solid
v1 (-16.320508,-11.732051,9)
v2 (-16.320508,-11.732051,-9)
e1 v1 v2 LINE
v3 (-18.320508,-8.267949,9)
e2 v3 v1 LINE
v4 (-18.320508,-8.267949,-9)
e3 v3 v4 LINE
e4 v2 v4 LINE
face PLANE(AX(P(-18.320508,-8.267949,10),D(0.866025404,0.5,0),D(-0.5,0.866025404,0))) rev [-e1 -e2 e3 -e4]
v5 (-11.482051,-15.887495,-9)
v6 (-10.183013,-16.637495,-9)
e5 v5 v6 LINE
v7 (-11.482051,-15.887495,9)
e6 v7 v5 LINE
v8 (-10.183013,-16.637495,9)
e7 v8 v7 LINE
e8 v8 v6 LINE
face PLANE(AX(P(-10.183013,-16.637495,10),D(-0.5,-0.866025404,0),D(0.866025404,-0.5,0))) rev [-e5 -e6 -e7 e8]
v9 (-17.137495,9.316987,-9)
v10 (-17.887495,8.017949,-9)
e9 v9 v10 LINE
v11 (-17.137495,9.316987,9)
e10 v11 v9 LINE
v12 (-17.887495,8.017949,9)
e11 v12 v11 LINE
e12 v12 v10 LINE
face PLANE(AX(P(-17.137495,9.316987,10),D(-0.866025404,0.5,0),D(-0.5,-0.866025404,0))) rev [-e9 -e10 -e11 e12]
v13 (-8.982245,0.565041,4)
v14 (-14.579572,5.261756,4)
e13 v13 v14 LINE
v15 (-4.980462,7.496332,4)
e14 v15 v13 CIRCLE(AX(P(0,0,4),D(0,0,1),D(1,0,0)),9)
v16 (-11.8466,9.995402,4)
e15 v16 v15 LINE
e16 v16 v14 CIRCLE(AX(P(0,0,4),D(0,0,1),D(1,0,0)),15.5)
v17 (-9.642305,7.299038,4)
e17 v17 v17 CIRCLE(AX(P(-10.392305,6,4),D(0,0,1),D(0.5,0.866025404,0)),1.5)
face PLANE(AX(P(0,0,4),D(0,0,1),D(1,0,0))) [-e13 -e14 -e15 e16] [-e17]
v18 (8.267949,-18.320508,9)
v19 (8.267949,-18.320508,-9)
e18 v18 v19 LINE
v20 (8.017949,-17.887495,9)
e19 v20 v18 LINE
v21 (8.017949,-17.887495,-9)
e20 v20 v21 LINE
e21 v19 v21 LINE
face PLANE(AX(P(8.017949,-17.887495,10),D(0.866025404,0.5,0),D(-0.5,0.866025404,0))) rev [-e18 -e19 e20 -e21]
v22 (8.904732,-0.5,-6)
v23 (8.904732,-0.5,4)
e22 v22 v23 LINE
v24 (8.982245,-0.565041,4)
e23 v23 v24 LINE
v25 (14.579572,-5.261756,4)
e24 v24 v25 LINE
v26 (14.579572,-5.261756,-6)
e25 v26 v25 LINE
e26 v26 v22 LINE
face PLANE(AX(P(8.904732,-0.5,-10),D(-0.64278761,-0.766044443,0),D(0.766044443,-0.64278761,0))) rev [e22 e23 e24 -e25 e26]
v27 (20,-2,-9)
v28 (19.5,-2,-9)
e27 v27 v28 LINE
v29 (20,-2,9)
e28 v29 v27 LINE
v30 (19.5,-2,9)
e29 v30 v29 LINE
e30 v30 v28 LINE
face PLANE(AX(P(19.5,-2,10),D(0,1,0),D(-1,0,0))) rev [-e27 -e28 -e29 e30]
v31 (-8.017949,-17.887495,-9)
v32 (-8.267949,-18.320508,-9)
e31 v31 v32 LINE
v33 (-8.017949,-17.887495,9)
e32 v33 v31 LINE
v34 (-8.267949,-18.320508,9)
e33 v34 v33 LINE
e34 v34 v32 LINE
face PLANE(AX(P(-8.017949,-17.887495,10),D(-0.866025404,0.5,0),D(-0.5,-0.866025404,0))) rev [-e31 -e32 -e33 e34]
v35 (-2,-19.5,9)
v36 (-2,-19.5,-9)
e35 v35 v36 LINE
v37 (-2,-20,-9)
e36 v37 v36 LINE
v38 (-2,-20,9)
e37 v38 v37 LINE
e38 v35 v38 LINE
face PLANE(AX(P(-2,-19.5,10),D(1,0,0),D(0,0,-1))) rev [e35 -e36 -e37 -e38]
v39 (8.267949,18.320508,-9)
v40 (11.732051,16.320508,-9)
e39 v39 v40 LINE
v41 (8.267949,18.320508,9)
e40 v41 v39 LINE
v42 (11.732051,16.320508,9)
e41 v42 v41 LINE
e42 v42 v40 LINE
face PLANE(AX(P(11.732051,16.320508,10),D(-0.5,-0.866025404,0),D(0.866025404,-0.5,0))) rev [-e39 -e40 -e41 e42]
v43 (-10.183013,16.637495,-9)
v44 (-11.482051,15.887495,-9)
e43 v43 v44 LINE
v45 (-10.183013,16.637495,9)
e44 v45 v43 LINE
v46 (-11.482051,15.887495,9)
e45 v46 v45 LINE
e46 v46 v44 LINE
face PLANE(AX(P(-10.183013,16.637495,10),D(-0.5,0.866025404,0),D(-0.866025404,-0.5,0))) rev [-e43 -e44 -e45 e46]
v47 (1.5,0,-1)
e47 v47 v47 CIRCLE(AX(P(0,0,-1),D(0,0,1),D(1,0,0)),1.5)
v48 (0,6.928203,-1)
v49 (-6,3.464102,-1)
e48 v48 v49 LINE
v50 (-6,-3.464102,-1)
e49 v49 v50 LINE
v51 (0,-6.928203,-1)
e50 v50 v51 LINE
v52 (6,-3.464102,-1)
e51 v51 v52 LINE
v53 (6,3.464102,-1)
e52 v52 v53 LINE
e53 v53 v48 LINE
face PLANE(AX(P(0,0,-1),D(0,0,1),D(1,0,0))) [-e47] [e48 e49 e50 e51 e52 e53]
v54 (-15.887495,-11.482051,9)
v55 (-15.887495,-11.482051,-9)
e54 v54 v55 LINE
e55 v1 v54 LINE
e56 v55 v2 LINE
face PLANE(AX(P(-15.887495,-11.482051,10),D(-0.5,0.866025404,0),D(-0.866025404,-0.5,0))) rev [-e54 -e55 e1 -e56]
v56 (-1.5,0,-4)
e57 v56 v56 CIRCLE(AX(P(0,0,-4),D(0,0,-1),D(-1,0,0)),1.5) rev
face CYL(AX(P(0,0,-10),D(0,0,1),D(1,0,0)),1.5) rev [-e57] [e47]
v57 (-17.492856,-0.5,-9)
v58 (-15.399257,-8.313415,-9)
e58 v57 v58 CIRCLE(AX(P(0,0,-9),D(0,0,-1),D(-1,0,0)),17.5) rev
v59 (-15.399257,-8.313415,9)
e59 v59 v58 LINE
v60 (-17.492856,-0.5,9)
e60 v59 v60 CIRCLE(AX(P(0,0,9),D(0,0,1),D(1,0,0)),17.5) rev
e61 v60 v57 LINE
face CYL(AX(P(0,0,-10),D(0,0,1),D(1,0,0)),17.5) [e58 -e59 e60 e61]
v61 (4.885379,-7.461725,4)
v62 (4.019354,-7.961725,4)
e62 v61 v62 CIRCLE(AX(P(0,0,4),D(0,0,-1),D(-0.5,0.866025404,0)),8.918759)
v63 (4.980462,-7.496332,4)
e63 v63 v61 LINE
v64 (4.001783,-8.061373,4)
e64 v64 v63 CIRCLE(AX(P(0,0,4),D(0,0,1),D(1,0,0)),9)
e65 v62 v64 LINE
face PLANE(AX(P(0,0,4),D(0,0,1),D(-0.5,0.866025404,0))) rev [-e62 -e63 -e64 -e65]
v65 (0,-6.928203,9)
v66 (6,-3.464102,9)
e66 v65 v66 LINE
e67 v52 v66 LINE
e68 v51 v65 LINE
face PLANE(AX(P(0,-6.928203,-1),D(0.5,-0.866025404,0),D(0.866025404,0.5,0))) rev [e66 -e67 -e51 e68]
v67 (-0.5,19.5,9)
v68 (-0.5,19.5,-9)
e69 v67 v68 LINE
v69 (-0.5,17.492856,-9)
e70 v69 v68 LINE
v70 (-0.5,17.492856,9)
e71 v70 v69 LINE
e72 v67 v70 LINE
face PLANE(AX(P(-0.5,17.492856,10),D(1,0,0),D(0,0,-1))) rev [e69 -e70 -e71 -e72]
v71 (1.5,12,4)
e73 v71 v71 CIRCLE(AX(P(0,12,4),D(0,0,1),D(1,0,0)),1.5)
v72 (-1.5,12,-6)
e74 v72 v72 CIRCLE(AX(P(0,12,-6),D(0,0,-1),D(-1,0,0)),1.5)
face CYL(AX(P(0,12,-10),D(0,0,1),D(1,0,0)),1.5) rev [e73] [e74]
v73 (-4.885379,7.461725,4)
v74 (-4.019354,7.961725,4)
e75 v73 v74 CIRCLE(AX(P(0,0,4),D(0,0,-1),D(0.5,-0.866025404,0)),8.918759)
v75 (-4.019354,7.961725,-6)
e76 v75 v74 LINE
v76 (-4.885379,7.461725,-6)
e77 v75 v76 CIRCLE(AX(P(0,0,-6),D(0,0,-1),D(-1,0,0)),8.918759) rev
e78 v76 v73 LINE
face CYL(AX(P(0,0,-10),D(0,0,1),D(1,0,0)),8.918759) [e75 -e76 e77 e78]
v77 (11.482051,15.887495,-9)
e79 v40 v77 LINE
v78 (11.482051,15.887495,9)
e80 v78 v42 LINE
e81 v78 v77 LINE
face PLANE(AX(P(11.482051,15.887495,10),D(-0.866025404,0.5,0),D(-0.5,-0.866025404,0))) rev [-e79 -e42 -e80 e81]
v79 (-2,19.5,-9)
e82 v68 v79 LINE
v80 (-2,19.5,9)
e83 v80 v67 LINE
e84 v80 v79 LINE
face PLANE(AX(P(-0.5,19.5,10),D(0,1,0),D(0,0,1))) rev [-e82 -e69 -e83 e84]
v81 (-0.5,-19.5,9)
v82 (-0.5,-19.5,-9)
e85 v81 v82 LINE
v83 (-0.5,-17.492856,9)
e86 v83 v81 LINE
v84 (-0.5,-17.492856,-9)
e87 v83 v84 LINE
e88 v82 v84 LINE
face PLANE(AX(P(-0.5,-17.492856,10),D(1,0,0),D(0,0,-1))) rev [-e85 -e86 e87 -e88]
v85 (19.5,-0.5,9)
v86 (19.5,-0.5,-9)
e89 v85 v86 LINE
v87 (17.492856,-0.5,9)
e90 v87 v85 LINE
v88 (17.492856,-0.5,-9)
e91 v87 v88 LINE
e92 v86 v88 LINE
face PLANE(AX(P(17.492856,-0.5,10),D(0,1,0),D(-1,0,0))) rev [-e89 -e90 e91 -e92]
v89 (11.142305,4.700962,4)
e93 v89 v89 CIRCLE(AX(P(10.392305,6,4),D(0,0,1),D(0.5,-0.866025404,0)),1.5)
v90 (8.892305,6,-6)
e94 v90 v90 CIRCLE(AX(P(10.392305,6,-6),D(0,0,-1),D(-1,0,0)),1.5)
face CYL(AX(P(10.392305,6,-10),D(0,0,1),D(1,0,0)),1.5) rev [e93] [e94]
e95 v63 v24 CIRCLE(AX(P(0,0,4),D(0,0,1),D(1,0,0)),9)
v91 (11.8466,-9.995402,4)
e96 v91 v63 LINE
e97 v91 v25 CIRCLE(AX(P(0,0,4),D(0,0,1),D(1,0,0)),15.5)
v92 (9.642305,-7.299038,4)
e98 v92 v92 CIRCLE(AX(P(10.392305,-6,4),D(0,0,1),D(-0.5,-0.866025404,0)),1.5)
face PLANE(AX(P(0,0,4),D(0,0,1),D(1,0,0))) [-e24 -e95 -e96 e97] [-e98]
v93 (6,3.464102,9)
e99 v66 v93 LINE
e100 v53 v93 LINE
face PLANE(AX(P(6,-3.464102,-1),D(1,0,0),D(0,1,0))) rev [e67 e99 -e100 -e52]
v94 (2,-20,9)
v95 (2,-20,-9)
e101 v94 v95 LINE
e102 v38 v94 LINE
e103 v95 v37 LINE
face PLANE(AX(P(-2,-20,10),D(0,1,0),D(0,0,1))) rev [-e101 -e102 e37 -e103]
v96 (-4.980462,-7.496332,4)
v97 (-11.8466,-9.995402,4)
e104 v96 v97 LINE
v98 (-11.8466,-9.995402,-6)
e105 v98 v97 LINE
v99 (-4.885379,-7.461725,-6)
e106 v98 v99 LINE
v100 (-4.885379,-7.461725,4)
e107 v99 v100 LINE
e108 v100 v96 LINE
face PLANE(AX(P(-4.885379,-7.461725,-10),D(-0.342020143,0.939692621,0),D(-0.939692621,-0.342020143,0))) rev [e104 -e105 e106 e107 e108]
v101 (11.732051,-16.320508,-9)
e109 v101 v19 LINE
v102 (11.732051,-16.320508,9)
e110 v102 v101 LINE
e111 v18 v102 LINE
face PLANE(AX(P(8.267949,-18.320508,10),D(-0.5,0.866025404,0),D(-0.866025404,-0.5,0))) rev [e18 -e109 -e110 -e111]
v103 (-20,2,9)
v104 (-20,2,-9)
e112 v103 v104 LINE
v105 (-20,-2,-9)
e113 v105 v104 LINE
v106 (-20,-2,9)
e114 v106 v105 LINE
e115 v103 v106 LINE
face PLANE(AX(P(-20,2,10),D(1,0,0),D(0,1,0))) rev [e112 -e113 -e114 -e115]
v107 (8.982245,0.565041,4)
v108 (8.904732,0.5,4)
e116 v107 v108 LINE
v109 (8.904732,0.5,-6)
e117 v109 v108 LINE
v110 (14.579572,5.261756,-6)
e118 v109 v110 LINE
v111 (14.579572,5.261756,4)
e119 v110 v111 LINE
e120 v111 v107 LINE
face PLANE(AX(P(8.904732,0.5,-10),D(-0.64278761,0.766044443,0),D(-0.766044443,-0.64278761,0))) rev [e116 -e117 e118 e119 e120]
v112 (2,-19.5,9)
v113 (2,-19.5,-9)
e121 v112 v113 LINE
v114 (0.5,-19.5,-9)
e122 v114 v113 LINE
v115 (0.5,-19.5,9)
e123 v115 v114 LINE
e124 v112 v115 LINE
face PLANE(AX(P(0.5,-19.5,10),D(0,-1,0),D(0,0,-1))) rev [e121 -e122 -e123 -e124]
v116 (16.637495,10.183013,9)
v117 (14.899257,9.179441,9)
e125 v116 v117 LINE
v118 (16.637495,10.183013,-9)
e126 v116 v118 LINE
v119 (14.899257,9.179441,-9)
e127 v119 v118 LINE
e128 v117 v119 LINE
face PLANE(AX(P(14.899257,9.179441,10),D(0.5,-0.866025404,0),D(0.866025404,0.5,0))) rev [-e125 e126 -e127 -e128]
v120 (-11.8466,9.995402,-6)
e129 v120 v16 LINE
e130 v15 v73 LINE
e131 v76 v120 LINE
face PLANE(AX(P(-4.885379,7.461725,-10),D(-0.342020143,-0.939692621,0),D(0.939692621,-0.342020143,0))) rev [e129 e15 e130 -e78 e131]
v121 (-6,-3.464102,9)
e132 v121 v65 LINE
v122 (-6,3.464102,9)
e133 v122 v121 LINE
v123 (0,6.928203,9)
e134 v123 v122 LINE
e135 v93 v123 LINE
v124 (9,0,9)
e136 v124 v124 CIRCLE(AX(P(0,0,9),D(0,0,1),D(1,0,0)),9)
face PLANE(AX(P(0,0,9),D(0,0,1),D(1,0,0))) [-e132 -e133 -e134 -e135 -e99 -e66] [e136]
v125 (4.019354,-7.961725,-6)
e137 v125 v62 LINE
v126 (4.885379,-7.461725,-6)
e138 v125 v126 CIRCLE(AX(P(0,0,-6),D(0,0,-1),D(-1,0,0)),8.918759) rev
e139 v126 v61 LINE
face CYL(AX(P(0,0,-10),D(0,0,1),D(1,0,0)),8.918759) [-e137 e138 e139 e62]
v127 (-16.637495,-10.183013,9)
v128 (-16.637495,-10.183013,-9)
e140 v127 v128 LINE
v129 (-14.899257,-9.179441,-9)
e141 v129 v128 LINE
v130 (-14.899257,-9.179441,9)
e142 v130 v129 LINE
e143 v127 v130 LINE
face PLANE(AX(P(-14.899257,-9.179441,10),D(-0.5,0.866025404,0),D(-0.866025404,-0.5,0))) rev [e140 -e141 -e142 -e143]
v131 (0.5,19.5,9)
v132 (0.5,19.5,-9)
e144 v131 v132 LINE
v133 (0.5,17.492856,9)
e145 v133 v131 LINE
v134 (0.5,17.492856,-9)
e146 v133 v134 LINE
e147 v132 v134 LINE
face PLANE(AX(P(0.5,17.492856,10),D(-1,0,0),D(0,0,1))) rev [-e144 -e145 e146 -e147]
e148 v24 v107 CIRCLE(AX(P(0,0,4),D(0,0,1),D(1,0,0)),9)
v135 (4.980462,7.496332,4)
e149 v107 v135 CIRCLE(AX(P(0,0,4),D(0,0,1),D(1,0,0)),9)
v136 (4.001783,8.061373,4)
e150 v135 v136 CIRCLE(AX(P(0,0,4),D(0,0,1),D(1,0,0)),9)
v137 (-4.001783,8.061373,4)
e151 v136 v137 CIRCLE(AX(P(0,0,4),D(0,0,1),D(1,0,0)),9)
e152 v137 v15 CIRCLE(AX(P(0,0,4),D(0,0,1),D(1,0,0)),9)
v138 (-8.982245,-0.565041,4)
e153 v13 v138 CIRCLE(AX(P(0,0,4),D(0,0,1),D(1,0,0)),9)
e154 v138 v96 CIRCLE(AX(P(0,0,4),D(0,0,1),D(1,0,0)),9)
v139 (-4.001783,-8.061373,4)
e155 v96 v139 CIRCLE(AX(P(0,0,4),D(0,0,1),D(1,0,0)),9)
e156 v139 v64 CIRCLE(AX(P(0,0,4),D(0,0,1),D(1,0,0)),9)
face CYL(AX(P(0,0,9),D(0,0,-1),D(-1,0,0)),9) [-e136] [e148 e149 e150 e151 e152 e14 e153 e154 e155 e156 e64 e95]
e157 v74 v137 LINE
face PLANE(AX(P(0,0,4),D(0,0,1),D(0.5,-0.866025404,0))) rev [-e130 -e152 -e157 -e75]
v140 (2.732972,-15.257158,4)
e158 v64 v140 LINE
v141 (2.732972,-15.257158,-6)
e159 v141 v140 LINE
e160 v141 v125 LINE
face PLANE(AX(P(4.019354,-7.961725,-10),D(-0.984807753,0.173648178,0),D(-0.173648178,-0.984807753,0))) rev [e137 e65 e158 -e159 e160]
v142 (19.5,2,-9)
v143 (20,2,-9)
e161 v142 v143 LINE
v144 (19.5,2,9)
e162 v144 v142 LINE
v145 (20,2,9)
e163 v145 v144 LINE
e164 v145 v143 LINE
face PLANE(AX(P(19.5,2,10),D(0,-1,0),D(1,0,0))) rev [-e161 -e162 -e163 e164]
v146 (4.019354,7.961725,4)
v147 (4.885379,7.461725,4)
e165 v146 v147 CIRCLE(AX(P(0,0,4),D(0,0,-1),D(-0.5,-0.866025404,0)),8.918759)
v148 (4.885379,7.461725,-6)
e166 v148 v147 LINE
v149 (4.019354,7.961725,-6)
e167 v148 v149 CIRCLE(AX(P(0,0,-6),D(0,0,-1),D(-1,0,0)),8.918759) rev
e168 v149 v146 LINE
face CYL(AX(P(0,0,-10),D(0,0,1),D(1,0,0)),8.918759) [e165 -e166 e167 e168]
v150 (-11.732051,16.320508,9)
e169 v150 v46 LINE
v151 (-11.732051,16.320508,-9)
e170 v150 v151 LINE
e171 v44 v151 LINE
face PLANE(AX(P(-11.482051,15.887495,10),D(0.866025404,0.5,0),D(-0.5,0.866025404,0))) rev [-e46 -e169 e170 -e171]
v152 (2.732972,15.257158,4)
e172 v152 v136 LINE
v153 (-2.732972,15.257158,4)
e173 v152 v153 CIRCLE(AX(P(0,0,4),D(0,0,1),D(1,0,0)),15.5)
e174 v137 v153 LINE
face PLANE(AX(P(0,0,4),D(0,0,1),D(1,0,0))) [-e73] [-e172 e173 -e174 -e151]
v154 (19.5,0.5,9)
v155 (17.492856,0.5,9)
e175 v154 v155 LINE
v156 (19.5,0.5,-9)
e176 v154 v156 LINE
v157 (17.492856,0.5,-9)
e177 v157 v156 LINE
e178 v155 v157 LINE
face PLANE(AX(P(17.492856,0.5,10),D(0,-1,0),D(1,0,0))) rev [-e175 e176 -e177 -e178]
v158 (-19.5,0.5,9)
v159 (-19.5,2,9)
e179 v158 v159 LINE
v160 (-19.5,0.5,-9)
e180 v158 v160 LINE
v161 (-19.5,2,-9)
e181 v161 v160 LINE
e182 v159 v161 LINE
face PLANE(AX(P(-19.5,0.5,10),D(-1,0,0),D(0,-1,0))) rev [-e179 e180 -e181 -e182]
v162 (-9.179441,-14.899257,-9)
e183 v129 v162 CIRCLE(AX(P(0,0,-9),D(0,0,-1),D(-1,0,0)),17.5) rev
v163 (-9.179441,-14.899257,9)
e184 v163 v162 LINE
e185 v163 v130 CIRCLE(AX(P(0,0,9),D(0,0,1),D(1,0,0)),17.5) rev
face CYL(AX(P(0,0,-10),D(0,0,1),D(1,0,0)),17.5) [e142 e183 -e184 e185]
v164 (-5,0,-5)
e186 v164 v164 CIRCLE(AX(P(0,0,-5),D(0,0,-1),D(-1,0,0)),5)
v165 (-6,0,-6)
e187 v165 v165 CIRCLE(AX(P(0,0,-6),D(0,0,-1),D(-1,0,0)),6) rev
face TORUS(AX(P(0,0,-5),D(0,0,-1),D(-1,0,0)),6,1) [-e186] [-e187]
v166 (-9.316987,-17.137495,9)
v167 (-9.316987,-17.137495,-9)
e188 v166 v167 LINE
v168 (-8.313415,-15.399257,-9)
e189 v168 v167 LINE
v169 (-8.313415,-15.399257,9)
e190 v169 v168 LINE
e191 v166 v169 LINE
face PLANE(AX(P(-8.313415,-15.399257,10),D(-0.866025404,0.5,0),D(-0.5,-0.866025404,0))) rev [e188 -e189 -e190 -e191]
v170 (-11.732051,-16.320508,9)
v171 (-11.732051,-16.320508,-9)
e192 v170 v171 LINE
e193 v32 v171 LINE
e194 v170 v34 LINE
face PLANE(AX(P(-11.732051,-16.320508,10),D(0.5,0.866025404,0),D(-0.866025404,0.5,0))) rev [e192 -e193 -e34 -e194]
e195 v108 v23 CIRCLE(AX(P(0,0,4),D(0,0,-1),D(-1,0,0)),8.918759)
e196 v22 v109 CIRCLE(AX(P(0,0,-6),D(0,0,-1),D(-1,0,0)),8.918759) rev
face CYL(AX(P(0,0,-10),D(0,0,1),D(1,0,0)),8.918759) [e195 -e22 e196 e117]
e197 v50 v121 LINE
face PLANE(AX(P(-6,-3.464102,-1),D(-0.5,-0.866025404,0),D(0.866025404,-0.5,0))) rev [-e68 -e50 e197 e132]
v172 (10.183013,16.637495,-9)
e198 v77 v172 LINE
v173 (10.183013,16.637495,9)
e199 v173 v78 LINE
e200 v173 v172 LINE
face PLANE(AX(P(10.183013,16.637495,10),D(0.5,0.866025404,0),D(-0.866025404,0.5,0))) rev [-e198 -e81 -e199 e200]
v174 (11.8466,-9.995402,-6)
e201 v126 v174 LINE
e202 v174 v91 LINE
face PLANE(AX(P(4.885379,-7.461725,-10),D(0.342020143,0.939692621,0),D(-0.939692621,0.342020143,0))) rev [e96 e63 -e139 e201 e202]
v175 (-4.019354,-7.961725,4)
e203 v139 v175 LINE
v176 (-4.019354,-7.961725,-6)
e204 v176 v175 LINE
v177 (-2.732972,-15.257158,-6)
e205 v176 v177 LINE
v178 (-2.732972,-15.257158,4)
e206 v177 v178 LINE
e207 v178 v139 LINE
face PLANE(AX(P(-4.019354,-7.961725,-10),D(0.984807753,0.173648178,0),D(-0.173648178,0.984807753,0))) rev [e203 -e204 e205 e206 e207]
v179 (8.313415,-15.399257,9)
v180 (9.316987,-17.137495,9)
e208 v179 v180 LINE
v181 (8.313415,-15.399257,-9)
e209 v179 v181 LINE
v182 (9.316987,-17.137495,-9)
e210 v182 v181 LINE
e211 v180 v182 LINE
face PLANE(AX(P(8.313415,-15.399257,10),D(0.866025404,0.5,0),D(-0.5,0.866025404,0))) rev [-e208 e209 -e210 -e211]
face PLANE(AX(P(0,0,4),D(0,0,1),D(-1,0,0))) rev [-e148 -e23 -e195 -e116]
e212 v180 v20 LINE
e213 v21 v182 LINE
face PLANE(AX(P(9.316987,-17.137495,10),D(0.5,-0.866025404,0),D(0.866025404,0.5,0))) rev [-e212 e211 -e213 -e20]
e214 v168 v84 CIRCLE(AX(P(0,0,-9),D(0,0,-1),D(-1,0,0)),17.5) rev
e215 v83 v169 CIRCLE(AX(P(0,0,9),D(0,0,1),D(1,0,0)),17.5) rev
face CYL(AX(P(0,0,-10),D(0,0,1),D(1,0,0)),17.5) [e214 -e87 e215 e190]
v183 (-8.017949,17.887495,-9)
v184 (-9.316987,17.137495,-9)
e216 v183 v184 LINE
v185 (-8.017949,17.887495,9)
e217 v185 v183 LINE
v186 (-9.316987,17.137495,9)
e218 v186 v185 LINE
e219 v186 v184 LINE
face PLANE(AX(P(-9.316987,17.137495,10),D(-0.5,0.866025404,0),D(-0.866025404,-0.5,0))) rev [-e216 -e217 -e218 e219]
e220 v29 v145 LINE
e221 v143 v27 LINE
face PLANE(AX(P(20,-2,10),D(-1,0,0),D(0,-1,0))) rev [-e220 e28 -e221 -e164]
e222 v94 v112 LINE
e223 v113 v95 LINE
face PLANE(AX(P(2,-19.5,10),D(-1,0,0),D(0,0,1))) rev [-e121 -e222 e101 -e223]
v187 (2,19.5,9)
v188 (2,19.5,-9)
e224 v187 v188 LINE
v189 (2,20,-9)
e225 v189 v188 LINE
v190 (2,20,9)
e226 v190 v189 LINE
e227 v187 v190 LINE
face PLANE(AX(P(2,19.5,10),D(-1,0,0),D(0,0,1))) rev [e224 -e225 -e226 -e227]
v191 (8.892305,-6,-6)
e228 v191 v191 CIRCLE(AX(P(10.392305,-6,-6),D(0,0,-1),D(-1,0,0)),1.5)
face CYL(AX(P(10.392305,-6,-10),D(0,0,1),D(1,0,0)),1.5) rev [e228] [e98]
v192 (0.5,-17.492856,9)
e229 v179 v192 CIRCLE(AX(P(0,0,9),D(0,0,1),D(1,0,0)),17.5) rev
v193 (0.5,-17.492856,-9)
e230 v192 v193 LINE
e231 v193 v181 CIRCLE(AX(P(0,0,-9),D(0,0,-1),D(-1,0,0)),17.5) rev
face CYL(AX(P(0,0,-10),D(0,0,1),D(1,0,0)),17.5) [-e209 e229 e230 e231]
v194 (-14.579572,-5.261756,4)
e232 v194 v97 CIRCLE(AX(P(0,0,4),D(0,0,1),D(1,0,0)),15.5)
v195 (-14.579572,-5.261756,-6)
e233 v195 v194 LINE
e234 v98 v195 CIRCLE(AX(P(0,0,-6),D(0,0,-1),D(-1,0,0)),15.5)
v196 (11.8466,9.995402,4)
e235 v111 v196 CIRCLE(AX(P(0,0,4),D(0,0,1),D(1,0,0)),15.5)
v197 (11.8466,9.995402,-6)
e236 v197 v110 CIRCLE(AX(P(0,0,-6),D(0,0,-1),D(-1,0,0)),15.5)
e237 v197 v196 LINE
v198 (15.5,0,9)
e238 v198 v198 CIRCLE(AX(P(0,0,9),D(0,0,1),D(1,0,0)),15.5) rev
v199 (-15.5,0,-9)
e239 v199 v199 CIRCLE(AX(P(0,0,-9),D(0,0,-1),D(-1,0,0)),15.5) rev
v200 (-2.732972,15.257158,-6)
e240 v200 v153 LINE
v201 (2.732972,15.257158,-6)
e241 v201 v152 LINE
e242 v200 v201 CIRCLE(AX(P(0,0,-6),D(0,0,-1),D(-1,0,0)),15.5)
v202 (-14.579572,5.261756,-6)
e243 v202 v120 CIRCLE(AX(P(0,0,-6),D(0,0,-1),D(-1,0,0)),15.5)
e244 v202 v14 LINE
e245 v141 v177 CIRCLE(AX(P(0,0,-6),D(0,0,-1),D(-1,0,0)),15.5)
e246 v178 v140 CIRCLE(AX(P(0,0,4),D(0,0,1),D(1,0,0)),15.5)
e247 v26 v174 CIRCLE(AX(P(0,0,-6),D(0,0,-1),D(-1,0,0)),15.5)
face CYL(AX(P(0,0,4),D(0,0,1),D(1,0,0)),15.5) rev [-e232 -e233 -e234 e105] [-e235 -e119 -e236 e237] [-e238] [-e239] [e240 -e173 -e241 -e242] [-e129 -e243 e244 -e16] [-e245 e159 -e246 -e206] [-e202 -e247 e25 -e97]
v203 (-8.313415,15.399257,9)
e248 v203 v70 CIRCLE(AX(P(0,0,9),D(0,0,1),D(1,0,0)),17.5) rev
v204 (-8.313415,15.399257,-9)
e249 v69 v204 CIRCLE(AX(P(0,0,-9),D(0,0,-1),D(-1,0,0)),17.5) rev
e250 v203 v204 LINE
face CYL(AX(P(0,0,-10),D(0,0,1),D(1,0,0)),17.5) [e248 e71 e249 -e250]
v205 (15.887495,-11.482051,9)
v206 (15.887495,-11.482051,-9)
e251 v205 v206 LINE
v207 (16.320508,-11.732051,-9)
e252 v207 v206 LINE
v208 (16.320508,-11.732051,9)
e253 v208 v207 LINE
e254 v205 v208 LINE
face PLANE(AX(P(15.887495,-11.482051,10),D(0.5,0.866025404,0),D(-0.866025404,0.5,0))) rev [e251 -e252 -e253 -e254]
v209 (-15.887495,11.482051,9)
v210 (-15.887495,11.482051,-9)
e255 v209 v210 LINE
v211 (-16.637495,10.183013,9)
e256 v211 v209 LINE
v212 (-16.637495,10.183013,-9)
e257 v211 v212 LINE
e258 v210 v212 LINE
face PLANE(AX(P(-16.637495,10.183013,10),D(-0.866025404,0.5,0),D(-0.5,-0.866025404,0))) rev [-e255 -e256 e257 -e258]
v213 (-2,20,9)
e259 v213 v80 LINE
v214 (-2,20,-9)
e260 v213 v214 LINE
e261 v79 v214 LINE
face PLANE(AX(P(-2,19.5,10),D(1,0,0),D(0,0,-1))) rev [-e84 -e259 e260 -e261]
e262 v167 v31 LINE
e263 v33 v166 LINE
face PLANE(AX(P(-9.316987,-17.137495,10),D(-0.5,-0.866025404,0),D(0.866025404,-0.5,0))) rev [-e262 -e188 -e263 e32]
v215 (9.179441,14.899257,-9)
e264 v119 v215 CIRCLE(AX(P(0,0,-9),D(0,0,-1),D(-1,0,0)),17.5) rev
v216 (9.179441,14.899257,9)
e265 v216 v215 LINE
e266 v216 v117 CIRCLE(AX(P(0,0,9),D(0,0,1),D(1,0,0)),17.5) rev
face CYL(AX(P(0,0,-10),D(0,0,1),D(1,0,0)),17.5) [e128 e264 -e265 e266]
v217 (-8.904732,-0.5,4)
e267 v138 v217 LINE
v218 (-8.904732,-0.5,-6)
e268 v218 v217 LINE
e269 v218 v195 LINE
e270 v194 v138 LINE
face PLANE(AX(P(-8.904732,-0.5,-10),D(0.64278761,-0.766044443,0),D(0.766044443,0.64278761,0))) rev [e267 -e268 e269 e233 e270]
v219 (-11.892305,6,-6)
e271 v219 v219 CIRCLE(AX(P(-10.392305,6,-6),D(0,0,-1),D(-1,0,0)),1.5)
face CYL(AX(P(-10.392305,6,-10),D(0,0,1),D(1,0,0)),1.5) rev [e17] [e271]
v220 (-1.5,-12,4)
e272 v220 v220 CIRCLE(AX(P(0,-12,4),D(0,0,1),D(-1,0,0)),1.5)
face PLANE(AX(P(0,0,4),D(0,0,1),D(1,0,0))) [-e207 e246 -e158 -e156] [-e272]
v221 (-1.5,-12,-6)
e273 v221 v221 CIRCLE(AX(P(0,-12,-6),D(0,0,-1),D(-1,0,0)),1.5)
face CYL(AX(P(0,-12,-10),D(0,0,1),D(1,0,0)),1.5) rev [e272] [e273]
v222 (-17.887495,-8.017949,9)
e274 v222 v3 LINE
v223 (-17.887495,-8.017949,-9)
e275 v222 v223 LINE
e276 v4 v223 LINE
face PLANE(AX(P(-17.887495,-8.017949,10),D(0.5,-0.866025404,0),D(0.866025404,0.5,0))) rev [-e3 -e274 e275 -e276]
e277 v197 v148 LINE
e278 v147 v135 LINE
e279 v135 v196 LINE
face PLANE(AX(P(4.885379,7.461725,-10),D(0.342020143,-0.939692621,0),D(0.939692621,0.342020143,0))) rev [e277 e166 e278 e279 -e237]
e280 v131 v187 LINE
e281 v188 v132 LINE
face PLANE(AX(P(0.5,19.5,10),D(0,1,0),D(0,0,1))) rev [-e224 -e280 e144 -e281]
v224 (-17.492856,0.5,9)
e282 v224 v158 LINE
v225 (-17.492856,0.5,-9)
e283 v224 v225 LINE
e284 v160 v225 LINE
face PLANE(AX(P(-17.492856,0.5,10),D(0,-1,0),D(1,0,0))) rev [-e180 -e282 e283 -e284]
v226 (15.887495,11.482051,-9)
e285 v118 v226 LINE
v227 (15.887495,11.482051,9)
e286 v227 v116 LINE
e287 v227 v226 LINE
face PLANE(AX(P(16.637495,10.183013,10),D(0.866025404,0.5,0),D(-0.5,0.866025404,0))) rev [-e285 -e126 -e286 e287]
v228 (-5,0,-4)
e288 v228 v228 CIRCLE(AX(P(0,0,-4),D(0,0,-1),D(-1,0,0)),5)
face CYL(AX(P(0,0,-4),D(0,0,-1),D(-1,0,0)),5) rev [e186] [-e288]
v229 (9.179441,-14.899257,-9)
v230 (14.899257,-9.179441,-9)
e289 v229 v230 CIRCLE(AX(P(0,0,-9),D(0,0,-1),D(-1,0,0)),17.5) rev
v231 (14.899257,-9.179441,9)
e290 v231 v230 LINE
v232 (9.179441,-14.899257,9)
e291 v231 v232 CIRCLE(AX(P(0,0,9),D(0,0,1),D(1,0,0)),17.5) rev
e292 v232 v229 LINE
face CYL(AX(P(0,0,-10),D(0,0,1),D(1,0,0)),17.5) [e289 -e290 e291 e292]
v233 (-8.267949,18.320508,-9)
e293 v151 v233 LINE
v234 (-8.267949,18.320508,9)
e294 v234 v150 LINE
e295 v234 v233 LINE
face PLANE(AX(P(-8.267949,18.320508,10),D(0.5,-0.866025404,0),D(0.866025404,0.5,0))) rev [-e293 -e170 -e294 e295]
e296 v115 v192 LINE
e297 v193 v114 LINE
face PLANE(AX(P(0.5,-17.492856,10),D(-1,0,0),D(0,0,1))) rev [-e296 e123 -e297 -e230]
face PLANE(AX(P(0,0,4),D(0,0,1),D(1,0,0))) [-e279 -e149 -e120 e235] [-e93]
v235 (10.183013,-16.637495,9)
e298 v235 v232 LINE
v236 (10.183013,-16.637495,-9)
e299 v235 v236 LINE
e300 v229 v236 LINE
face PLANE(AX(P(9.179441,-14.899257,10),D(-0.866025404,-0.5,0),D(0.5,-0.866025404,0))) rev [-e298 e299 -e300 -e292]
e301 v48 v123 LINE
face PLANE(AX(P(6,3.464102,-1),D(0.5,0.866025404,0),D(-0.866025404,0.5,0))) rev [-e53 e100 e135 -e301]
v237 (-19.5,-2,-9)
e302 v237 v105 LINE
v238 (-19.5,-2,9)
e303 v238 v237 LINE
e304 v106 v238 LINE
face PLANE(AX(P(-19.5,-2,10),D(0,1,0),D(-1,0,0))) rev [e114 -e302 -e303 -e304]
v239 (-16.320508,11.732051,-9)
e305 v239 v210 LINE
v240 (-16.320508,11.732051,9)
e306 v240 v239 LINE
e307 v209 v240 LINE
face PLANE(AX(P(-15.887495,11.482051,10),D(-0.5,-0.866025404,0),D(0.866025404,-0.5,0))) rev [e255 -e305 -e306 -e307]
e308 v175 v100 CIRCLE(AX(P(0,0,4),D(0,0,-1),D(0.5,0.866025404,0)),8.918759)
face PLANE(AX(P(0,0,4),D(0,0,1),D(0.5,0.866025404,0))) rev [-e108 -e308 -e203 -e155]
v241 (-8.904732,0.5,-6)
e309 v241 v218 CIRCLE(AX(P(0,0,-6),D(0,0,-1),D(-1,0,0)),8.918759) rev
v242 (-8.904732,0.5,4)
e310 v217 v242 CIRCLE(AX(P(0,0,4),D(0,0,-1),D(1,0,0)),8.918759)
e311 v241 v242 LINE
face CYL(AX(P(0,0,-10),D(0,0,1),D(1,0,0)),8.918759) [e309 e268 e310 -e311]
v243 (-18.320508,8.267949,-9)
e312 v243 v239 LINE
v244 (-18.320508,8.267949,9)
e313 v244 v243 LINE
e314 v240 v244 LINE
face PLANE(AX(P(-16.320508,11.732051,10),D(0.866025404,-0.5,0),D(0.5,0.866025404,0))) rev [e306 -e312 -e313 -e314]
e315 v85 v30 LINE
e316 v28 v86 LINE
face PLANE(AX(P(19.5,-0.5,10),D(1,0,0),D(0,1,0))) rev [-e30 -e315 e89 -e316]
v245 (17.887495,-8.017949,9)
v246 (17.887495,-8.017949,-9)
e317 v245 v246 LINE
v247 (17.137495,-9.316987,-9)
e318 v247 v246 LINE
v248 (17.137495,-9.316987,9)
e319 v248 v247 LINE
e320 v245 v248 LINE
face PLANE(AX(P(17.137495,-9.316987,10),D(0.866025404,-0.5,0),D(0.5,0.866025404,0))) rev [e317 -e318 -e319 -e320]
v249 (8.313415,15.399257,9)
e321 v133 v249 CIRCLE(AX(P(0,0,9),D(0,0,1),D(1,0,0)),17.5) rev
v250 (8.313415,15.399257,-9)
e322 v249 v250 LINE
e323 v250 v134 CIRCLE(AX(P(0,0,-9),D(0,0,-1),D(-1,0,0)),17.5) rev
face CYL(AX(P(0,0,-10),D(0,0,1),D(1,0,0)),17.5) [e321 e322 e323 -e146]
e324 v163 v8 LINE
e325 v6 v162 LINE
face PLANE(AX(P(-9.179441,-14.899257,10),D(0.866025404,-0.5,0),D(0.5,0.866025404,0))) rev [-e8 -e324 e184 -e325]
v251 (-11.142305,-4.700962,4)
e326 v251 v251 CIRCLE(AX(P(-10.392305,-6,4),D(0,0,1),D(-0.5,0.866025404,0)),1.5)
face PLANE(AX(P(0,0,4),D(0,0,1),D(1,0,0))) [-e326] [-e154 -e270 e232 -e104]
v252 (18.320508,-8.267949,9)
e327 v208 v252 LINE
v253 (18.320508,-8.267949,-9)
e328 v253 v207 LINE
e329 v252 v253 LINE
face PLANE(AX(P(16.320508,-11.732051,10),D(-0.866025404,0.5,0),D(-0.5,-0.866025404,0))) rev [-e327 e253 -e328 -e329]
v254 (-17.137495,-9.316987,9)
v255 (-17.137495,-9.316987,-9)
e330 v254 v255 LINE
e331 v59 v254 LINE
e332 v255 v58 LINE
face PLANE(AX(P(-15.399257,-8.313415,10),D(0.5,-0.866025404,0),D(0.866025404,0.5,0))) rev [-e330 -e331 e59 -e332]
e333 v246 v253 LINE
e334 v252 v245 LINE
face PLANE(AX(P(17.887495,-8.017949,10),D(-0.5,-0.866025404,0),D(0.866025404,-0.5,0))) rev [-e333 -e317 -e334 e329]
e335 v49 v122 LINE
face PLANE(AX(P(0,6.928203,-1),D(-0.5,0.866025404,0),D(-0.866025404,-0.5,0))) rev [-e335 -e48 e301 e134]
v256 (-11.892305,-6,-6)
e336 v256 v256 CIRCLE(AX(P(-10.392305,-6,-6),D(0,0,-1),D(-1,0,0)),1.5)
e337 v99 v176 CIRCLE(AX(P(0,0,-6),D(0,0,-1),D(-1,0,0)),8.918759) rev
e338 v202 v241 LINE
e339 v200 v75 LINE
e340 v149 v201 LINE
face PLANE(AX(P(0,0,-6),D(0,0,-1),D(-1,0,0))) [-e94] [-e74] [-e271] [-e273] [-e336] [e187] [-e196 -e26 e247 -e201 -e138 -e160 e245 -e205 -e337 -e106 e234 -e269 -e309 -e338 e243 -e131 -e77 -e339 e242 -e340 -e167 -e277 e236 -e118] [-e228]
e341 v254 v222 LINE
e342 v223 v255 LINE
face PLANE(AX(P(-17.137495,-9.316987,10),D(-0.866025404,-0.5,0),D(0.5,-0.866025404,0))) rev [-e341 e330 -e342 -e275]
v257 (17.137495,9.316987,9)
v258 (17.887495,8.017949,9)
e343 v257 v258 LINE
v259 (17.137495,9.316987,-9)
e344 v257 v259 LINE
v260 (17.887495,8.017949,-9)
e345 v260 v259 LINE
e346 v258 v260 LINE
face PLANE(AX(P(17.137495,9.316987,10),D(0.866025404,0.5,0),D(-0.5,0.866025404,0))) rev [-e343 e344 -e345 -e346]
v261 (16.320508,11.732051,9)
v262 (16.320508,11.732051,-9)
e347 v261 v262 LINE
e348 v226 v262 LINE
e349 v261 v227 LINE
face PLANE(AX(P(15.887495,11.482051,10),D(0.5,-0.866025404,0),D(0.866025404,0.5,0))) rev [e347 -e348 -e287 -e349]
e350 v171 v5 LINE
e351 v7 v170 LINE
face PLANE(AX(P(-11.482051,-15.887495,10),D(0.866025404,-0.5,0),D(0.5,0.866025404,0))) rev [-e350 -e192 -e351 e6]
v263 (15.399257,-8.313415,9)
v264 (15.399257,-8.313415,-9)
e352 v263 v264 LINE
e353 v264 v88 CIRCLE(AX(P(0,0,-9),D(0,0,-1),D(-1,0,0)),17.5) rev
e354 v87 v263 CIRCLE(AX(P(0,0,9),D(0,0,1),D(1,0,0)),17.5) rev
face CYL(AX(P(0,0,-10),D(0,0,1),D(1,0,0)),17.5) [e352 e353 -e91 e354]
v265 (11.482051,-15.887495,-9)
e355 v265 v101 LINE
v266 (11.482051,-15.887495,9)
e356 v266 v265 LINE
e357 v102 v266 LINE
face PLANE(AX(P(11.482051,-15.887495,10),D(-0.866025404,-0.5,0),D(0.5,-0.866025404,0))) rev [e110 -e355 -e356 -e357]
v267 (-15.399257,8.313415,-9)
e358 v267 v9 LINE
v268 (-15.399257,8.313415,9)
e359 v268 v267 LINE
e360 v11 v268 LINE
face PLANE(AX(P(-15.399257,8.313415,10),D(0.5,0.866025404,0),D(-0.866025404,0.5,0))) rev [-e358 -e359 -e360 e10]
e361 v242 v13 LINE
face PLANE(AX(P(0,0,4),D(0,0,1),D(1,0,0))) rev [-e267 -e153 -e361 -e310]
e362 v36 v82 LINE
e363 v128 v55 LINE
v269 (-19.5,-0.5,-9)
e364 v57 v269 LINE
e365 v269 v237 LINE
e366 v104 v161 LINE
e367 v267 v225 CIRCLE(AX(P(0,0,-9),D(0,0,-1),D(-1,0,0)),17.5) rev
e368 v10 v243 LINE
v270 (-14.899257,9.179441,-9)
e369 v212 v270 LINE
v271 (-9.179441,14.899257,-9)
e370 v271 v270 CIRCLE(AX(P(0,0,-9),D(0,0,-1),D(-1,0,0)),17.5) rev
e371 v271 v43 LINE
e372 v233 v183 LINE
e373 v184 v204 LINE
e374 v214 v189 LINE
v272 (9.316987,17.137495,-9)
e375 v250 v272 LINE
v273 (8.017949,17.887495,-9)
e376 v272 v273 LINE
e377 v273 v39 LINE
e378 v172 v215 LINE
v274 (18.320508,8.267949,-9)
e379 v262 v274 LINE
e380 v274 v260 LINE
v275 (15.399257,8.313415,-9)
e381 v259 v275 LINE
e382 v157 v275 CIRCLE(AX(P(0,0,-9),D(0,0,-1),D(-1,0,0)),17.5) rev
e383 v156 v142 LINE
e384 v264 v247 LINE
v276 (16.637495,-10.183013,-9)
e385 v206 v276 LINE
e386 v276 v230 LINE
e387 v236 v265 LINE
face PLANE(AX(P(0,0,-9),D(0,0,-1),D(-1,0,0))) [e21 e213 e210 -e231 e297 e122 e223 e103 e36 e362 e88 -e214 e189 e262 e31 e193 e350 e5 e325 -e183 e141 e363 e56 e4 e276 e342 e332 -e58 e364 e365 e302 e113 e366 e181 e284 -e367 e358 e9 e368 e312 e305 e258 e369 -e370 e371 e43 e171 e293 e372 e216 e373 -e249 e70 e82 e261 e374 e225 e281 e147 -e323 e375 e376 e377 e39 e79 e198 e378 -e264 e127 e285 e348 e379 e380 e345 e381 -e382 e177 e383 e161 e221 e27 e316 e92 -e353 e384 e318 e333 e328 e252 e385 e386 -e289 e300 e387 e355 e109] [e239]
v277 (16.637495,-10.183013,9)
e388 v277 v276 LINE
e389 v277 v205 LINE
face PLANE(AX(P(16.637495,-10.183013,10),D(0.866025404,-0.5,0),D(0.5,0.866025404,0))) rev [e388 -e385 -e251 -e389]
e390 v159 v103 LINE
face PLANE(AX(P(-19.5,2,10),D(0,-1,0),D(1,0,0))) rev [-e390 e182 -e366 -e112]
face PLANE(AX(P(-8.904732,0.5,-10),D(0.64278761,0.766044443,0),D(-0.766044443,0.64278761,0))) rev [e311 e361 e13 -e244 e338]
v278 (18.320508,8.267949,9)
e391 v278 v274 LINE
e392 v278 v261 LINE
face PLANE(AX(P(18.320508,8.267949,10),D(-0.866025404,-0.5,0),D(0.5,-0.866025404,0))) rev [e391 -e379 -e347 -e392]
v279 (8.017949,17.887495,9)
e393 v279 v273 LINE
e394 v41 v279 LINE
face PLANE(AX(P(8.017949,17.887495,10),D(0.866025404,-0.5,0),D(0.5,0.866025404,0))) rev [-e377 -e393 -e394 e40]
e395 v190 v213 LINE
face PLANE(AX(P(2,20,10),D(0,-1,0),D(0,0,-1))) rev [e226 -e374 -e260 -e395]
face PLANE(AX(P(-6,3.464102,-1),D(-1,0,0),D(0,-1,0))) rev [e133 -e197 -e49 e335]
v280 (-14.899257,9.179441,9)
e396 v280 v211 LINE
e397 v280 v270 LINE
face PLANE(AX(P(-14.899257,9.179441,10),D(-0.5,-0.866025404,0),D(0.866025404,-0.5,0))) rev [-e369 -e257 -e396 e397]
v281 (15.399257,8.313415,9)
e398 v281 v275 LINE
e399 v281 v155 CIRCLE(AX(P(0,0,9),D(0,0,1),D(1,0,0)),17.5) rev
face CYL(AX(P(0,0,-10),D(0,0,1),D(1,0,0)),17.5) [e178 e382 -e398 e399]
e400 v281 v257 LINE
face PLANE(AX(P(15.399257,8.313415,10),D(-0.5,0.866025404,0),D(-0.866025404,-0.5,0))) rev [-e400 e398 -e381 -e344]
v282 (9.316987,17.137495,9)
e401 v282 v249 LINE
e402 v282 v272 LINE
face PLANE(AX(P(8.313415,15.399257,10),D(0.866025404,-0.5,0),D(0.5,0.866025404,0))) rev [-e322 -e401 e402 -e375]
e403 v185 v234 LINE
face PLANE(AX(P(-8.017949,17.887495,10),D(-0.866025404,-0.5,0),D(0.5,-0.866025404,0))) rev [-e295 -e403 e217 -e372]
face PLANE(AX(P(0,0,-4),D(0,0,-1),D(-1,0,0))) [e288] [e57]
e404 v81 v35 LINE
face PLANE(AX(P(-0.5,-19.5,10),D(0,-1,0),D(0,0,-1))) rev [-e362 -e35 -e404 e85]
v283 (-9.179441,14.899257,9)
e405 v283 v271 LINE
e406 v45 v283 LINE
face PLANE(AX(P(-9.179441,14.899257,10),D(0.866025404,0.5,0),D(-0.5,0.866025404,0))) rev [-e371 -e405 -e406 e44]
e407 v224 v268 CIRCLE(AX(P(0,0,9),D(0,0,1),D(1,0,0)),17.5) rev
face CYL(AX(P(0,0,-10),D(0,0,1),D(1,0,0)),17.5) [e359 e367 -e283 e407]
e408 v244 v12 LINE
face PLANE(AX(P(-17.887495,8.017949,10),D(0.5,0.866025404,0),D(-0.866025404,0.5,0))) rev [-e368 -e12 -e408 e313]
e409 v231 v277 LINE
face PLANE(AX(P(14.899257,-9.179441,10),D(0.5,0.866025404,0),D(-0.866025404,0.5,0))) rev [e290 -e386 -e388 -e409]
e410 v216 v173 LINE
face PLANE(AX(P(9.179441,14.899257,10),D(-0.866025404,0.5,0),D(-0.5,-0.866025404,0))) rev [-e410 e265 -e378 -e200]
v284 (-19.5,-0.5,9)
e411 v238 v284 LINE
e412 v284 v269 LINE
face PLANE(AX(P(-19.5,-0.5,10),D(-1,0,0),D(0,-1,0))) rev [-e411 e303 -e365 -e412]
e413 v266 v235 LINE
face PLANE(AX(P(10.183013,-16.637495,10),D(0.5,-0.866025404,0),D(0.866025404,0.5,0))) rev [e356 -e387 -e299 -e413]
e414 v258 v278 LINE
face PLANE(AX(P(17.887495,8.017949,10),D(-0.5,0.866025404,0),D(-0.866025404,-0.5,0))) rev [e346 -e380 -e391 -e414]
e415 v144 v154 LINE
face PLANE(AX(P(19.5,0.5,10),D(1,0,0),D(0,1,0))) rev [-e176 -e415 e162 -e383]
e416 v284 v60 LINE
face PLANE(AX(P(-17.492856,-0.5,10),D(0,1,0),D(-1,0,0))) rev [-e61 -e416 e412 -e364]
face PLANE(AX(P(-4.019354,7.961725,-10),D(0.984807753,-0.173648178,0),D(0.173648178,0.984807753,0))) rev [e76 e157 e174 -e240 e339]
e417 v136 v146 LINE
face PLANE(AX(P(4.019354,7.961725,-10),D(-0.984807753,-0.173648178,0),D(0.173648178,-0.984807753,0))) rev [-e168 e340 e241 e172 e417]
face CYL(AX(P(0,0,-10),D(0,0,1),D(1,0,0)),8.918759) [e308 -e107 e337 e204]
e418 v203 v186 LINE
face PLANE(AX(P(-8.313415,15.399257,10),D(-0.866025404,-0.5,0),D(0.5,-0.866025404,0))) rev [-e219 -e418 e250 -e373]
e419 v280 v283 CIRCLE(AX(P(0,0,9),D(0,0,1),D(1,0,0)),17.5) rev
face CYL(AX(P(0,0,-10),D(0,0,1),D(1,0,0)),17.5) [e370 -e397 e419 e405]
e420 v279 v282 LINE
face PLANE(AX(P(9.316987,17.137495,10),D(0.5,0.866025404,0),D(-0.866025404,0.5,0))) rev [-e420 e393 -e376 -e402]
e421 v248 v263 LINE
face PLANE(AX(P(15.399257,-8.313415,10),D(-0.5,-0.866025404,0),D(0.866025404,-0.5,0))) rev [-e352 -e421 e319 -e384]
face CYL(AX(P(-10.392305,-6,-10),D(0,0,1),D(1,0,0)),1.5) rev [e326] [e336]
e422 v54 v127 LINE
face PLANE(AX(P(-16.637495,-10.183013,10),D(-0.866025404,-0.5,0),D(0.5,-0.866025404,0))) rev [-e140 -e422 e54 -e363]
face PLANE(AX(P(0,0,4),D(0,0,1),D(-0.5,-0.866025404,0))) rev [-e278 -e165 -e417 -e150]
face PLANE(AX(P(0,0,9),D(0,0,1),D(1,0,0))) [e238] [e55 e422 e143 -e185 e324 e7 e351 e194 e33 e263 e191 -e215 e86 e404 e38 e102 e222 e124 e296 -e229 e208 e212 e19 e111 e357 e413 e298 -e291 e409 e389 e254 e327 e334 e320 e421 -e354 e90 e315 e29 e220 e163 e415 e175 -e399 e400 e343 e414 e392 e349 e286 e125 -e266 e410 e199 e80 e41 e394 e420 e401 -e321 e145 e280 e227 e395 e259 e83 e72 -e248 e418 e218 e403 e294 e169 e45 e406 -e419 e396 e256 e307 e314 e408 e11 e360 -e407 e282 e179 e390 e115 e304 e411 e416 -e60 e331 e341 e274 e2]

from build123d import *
from build123d.topology import SkipClean

# Parameters (mm, degrees)
SKETCH_1_R               = 27
EXTRUDE_1_DEPTH          = 10
FILLET_1_R               = 2
SKETCH_2_R               = 15.5
CUT_EXTRUDE_2_DEPTH      = 6
SKETCH_4_R               = 9
EXTRUDE_2_DEPTH          = 5
CUT_EXTRUDE_3_DEPTH      = 10
SKETCH_6_R               = 1.5
CUT_EXTRUDE_4_DEPTH      = 40.736633041
CUT_EXTRUDE_START        = -4
SKETCH_8_R               = 15.5
CUT_EXTRUDE_5_DEPTH      = 4
CUT_EXTRUDE_8_DEPTH      = 41.669398882
SKETCH_10_R              = 1.5
CUT_EXTRUDE_9_DEPTH      = 41.669398882
PATTERN_CIRCULAR_2_COUNT = 6
SKETCH_11_R              = 5
CUT_EXTRUDE_10_DEPTH     = 2
FILLET_2_R               = 1
SKETCH_12_OUTSIDE_W      = 71.788
SKETCH_12_OUTSIDE_H      = 71.788
SKETCH_12_OUTSIDE_R      = 17.5
CUT_EXTRUDE_11_DEPTH     = 20
EXTRUDE_3_DEPTH          = 10
PATTERN_CIRCULAR_3_COUNT = 12
SKETCH_15_R              = 32.027558883
CUT_EXTRUDE_12_DEPTH     = 1
SKETCH_16_R              = 25.808515359
CUT_EXTRUDE_13_DEPTH     = 1


with BuildPart() as part:
    # 草图1 → 凸台-拉伸1 (new, symmetric)
    with BuildSketch(Plane.XY):
        Circle(SKETCH_1_R)
    extrude(amount=EXTRUDE_1_DEPTH, both=True)

    # 圆角1
    fillet_1_edges = [part.edges().sort_by_distance(p)[0] for p in [
        (-27, 0, -10),
        (-27, 0, 10),
    ]]
    fillet(fillet_1_edges, radius=FILLET_1_R)

    # 草图2 → 切除-拉伸2 (cut)
    with BuildSketch(Plane.XY.offset(10)):
        Circle(SKETCH_2_R)
    extrude(amount=-CUT_EXTRUDE_2_DEPTH, mode=Mode.SUBTRACT)

    # 草图4 → 凸台-拉伸2 (add)
    with BuildSketch(Plane.XY.offset(4)):
        Circle(SKETCH_4_R)
    extrude(amount=EXTRUDE_2_DEPTH)

    # 草图5 → 切除-拉伸3 (cut)
    with BuildSketch(Plane.XY.offset(9)):
        Polygon((0, 6.92820323), (-6, 3.464101615), (-6, -3.464101615), (0, -6.92820323), (6, -3.464101615), (6, 3.464101615), align=None)
    extrude(amount=-CUT_EXTRUDE_3_DEPTH, mode=Mode.SUBTRACT)

    # 草图6 → 切除-拉伸4 (cut, through all)
    with BuildSketch(Plane.XY.offset(-1)):
        Circle(SKETCH_6_R)
    extrude(amount=-CUT_EXTRUDE_4_DEPTH, mode=Mode.SUBTRACT)

    # 草图8 → 切除-拉伸5 (cut)
    with BuildSketch(Plane(origin=(0, 0, -10), x_dir=(-1, 0, 0), z_dir=(0, 0, -1)).offset(CUT_EXTRUDE_START)):
        with Locations(Location((0, 0, 0), (0, 0, 180))):
            Circle(SKETCH_8_R)
    extrude(amount=CUT_EXTRUDE_5_DEPTH, mode=Mode.SUBTRACT)

    # 草图9 → 切除-拉伸8 (cut, through all)
    with SkipClean():  # the faces are left unmerged after this step: merging them gives an invalid solid
        with BuildSketch(Plane.XY.offset(4)):
            with BuildLine():
                Line((-8.904732448, 0.5), (-14.57957217, 5.261755918))
                ThreePointArc((-14.57957217, 5.261755918), (-15.5, 0), (-14.57957217, -5.261755918))
                Line((-14.57957217, -5.261755918), (-8.904732448, -0.5))
                ThreePointArc((-8.904732448, -0.5), (-8.91875888, 0), (-8.904732448, 0.5))
            make_face()
        cut_extrude_8 = extrude(amount=-CUT_EXTRUDE_8_DEPTH, mode=Mode.SUBTRACT)
    add(part.part.scale(1), mode=Mode.REPLACE)  # the faces are merged on a copy

    # 草图10 → 切除-拉伸9 (cut, through all)
    with BuildSketch(Plane.XY.offset(4)):
        with Locations((0, 12)):
            Circle(SKETCH_10_R)
    cut_extrude_9 = extrude(amount=-CUT_EXTRUDE_9_DEPTH, mode=Mode.SUBTRACT)

    # 阵列(圆周)2: 切除-拉伸8, 切除-拉伸9 ×6 about axis
    with SkipClean():  # the faces are left unmerged after this step: merging them gives an invalid solid
        pattern_circular_2_axis = Axis((0, 0, 0), (0, 0, 1))
        add([cut_extrude_8.rotate(pattern_circular_2_axis, i * 360 / PATTERN_CIRCULAR_2_COUNT) for i in range(1, PATTERN_CIRCULAR_2_COUNT)], mode=Mode.SUBTRACT)
        add([cut_extrude_9.rotate(pattern_circular_2_axis, i * 360 / PATTERN_CIRCULAR_2_COUNT) for i in range(1, PATTERN_CIRCULAR_2_COUNT)], mode=Mode.SUBTRACT)

    # 草图11 → 切除-拉伸10 (cut)
    with SkipClean():  # the faces are left unmerged after this step: merging them gives an invalid solid
        with BuildSketch(Plane(origin=(0, 0, -6), x_dir=(-1, 0, 0), z_dir=(0, 0, -1))):
            Circle(SKETCH_11_R)
        extrude(amount=-CUT_EXTRUDE_10_DEPTH, mode=Mode.SUBTRACT)

    # 圆角2
    fillet_2_edges = [part.edges().sort_by_distance(p)[0] for p in [
        (5, 0, -6),
    ]]
    fillet(fillet_2_edges, radius=FILLET_2_R)

    # 草图12 outside → 切除-拉伸11 (cut)
    with BuildSketch(Plane.XY.offset(10)):
        Rectangle(SKETCH_12_OUTSIDE_W, SKETCH_12_OUTSIDE_H)
        Circle(SKETCH_12_OUTSIDE_R, mode=Mode.SUBTRACT)
    extrude(amount=-CUT_EXTRUDE_11_DEPTH, mode=Mode.SUBTRACT)

    # 草图13 → 凸台-拉伸3 (add, symmetric)
    with BuildSketch(Plane.XY):
        with BuildLine():
            Line((0.5, 17.492855685), (0.5, 19.5))
            Line((0.5, 19.5), (2, 19.5))
            Line((2, 19.5), (2, 20))
            Line((2, 20), (-2, 20))
            Line((-2, 20), (-2, 19.5))
            Line((-2, 19.5), (-0.5, 19.5))
            Line((-0.5, 19.5), (-0.5, 17.492855685))
            ThreePointArc((-0.5, 17.492855685), (0, 17.5), (0.5, 17.492855685))
        make_face()
    extrude_3 = extrude(amount=EXTRUDE_3_DEPTH, both=True)

    # 阵列(圆周)3: 凸台-拉伸3 ×12 about axis
    with SkipClean():  # the faces are left unmerged after this step: merging them gives an invalid solid
        pattern_circular_3_axis = Axis((0, 0, 0), (0, 0, 1))
        for i in range(1, PATTERN_CIRCULAR_3_COUNT):
            add(extrude_3.rotate(pattern_circular_3_axis, i * 360 / PATTERN_CIRCULAR_3_COUNT))

    # 草图15 → 切除-拉伸12 (cut)
    with SkipClean():  # the faces are left unmerged after this step: merging them gives an invalid solid
        with BuildSketch(Plane(origin=(0, 0, -10), x_dir=(-1, 0, 0), z_dir=(0, 0, -1))):
            Circle(SKETCH_15_R)
        extrude(amount=-CUT_EXTRUDE_12_DEPTH, mode=Mode.SUBTRACT)

    # 草图16 → 切除-拉伸13 (cut)
    with BuildSketch(Plane.XY.offset(10)):
        Circle(SKETCH_16_R)
    extrude(amount=-CUT_EXTRUDE_13_DEPTH, mode=Mode.SUBTRACT)


solid = part.part
